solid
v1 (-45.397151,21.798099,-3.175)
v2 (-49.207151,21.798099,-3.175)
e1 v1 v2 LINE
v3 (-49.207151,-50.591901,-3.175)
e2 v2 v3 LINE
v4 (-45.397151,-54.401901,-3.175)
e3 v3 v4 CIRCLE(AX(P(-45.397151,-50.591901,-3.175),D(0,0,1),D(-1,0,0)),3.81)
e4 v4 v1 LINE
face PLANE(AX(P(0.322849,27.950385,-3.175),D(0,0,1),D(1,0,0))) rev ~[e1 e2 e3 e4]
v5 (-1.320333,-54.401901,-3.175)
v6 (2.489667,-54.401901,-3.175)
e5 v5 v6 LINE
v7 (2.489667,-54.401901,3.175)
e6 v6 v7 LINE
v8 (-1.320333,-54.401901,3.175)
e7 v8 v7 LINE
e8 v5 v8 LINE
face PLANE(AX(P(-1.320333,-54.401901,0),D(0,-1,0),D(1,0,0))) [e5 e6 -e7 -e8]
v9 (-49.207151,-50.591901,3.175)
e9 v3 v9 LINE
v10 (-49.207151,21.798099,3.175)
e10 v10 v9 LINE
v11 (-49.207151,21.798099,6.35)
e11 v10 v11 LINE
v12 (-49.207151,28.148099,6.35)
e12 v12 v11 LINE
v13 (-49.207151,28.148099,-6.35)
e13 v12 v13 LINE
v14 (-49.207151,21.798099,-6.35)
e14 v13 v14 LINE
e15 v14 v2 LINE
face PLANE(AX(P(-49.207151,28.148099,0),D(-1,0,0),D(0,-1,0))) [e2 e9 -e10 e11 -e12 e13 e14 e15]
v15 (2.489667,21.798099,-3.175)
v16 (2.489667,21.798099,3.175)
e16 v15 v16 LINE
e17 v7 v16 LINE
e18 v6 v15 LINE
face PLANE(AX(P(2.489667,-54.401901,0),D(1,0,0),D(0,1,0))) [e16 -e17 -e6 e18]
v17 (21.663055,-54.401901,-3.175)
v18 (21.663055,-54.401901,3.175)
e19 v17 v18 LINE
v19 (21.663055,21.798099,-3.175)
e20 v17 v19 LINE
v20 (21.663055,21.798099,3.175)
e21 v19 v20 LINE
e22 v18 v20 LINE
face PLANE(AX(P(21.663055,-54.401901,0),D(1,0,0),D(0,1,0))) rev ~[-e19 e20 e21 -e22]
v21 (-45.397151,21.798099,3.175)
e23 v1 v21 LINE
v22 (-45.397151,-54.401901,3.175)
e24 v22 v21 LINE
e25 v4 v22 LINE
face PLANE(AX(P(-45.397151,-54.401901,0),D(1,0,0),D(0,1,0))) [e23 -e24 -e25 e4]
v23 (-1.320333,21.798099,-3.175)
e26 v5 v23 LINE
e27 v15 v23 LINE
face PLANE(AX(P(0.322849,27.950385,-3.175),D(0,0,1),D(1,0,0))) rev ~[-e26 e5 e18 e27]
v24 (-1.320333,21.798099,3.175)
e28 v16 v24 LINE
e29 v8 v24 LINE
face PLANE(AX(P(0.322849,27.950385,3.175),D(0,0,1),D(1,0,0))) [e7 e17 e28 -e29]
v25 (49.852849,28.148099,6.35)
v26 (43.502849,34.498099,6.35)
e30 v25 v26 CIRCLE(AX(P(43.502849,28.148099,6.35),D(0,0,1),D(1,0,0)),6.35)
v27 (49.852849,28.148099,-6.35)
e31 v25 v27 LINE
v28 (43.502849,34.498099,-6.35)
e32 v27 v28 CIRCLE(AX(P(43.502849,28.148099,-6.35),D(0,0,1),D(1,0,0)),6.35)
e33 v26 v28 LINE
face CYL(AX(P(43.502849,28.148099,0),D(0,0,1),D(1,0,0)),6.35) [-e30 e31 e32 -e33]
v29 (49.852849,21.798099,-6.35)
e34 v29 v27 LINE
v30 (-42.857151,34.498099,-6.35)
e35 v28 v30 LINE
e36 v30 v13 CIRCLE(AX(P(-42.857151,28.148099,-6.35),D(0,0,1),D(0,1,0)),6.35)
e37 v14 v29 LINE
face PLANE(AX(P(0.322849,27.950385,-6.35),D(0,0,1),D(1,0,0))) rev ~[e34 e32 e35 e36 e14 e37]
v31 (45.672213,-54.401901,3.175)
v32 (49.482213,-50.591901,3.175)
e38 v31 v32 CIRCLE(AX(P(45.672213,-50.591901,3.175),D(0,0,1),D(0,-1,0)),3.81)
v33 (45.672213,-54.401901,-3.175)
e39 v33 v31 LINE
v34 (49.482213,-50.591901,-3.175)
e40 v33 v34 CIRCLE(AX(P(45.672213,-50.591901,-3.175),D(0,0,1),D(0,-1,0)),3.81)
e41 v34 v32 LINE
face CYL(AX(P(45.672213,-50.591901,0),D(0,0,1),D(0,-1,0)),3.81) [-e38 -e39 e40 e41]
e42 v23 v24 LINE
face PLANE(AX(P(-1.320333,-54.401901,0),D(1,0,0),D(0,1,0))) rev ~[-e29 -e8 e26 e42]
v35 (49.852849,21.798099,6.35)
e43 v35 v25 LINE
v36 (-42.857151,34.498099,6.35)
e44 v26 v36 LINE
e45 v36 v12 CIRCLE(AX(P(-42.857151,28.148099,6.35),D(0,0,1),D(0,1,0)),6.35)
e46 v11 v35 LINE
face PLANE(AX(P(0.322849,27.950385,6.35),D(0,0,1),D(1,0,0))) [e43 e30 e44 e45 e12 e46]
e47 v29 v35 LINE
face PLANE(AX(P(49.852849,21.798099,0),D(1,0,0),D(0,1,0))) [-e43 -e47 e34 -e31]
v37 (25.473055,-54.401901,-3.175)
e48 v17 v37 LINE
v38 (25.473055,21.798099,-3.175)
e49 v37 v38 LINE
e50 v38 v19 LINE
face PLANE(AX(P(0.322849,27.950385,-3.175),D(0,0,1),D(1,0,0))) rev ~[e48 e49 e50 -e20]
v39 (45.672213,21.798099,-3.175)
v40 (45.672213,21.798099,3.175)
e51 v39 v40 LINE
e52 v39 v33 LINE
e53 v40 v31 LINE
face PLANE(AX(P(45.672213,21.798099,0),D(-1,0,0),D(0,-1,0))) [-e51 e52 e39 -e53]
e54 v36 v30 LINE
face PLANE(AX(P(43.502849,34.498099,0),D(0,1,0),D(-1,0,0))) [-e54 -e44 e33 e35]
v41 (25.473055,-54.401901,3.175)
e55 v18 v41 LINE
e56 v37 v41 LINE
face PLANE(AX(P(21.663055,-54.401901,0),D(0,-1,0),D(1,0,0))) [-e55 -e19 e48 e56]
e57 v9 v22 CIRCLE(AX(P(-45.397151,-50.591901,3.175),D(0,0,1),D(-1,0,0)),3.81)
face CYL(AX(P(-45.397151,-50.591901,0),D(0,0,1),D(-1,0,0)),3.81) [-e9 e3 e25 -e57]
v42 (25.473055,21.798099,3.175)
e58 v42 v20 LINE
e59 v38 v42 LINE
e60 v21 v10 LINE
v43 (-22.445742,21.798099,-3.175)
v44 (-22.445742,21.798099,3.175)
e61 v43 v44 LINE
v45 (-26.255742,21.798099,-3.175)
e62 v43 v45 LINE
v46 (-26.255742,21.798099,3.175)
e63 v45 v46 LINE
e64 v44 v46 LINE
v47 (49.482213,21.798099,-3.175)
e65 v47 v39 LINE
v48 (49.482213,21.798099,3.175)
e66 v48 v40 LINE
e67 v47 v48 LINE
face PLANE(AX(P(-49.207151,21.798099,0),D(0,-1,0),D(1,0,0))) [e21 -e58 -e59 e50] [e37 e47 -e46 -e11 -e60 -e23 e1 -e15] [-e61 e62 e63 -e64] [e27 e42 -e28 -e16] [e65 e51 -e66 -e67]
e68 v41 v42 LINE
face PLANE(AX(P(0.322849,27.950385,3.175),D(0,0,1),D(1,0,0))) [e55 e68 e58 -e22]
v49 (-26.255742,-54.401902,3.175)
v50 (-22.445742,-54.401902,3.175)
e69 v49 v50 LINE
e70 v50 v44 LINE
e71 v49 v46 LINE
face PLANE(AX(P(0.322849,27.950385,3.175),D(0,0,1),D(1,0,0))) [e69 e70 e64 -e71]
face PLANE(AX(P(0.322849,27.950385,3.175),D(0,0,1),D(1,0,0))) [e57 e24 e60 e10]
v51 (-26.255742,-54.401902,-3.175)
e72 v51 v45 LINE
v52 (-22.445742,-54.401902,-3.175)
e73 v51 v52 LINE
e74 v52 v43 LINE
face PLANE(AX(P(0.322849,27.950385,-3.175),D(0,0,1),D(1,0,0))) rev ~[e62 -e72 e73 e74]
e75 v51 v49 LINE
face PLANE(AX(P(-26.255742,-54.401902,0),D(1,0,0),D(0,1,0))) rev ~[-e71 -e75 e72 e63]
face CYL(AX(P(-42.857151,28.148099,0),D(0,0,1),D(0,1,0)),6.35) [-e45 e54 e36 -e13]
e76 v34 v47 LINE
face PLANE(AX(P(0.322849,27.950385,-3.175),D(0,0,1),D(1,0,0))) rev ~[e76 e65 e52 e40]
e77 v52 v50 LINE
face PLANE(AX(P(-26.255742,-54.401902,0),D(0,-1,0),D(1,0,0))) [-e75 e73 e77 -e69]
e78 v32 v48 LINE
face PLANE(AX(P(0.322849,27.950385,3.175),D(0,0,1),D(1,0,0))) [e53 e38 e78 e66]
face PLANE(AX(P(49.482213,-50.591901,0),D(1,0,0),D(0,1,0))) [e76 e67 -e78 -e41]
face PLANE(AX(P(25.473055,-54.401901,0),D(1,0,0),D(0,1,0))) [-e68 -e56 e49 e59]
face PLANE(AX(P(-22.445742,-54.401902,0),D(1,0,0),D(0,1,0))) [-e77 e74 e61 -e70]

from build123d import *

# Parameters (mm, degrees)
F1_DEPTH = 6.35
F0_W     = 3.81
F0_H     = 76.2000009209
F0_H_2   = 76.2
F2_DEPTH = 3.175


# Not quite as in the source:
# - ends of sketch curves that miss each other by under 0.0002 mm in the source are joined


with BuildPart() as f1:
    # F0 (on Top) → F1 (new body, symmetric)
    with BuildSketch(Plane.XY):
        with BuildLine():
            Line((-49.2071506187, 28.1480993807), (-49.2071506187, 21.7980993807))
            Line((-49.2071506187, 21.7980993807), (-45.3971506187, 21.7980993807))
            Line((-45.3971506187, 21.7980993807), (-26.2557423981, 21.7980993807))
            Line((-26.2557423981, 21.7980993807), (-22.4457423981, 21.7980993807))
            Line((-22.4457423981, 21.7980993807), (-1.3203332201, 21.7980993807))
            Line((-1.3203332201, 21.7980993807), (2.4896667799, 21.7980993807))
            Line((2.4896667799, 21.7980993807), (21.6630548239, 21.7980993807))
            Line((21.6630548239, 21.7980993807), (25.4730548239, 21.7980993807))
            Line((25.4730548239, 21.7980993807), (45.6722128358, 21.7980993807))
            Line((45.6722128358, 21.7980993807), (49.4822128358, 21.7980993807))
            Line((49.4822128358, 21.7980993807), (49.8528493813, 21.7980993807))
            Line((49.8528493813, 21.7980993807), (49.8528493813, 28.1480993807))
            ThreePointArc((49.8528493813, 28.1480993807), (47.9929774418, 32.6382274413), (43.5028493813, 34.4980993807))
            Line((43.5028493813, 34.4980993807), (-42.8571506187, 34.4980993807))
            ThreePointArc((-42.8571506187, 34.4980993807), (-47.3472786793, 32.6382274413), (-49.2071506187, 28.1480993807))
        make_face()
    extrude(amount=F1_DEPTH, both=True)

    # F0 (on Top) → F2 (join, symmetric)
    with BuildSketch(Plane.XY):
        with BuildLine():
            Line((-49.2071506187, 28.1480993807), (-49.2071506187, 21.7980993807))
            Line((-49.2071506187, 21.7980993807), (-45.3971506187, 21.7980993807))
            Line((-45.3971506187, 21.7980993807), (-26.2557423981, 21.7980993807))
            Line((-26.2557423981, 21.7980993807), (-22.4457423981, 21.7980993807))
            Line((-22.4457423981, 21.7980993807), (-1.3203332201, 21.7980993807))
            Line((-1.3203332201, 21.7980993807), (2.4896667799, 21.7980993807))
            Line((2.4896667799, 21.7980993807), (21.6630548239, 21.7980993807))
            Line((21.6630548239, 21.7980993807), (25.4730548239, 21.7980993807))
            Line((25.4730548239, 21.7980993807), (45.6722128358, 21.7980993807))
            Line((45.6722128358, 21.7980993807), (49.4822128358, 21.7980993807))
            Line((49.4822128358, 21.7980993807), (49.8528493813, 21.7980993807))
            Line((49.8528493813, 21.7980993807), (49.8528493813, 28.1480993807))
            ThreePointArc((49.8528493813, 28.1480993807), (47.9929774418, 32.6382274413), (43.5028493813, 34.4980993807))
            Line((43.5028493813, 34.4980993807), (-42.8571506187, 34.4980993807))
            ThreePointArc((-42.8571506187, 34.4980993807), (-47.3472786793, 32.6382274413), (-49.2071506187, 28.1480993807))
        make_face()
        with BuildLine():
            Line((-45.3971506187, 21.7980993807), (-49.2071506187, 21.7980993807))
            Line((-49.2071506187, 21.7980993807), (-49.2071506187, -50.5919006193))
            ThreePointArc((-49.2071506187, -50.5919006193), (-48.0912274551, -53.2859774556), (-45.3971506187, -54.4019006193))
            Line((-45.3971506187, -54.4019006193), (-45.3971506187, 21.7980993807))
        make_face()
        with Locations((-24.3507423981, -16.3019010797)):
            Rectangle(F0_W, F0_H)
        with Locations((0.5846667799, -16.3019006193)):
            Rectangle(F0_W, F0_H_2)
        with Locations((23.5680548239, -16.3019006193)):
            Rectangle(F0_W, F0_H_2)
        with BuildLine():
            Line((49.4822128358, -50.5919006193), (49.4822128358, 21.7980993807))
            Line((49.4822128358, 21.7980993807), (45.6722128358, 21.7980993807))
            Line((45.6722128358, 21.7980993807), (45.6722128358, -54.4019006193))
            ThreePointArc((45.6722128358, -54.4019006193), (48.3662896722, -53.2859774556), (49.4822128358, -50.5919006193))
        make_face()
    extrude(amount=F2_DEPTH, both=True)


solid = f1.part
